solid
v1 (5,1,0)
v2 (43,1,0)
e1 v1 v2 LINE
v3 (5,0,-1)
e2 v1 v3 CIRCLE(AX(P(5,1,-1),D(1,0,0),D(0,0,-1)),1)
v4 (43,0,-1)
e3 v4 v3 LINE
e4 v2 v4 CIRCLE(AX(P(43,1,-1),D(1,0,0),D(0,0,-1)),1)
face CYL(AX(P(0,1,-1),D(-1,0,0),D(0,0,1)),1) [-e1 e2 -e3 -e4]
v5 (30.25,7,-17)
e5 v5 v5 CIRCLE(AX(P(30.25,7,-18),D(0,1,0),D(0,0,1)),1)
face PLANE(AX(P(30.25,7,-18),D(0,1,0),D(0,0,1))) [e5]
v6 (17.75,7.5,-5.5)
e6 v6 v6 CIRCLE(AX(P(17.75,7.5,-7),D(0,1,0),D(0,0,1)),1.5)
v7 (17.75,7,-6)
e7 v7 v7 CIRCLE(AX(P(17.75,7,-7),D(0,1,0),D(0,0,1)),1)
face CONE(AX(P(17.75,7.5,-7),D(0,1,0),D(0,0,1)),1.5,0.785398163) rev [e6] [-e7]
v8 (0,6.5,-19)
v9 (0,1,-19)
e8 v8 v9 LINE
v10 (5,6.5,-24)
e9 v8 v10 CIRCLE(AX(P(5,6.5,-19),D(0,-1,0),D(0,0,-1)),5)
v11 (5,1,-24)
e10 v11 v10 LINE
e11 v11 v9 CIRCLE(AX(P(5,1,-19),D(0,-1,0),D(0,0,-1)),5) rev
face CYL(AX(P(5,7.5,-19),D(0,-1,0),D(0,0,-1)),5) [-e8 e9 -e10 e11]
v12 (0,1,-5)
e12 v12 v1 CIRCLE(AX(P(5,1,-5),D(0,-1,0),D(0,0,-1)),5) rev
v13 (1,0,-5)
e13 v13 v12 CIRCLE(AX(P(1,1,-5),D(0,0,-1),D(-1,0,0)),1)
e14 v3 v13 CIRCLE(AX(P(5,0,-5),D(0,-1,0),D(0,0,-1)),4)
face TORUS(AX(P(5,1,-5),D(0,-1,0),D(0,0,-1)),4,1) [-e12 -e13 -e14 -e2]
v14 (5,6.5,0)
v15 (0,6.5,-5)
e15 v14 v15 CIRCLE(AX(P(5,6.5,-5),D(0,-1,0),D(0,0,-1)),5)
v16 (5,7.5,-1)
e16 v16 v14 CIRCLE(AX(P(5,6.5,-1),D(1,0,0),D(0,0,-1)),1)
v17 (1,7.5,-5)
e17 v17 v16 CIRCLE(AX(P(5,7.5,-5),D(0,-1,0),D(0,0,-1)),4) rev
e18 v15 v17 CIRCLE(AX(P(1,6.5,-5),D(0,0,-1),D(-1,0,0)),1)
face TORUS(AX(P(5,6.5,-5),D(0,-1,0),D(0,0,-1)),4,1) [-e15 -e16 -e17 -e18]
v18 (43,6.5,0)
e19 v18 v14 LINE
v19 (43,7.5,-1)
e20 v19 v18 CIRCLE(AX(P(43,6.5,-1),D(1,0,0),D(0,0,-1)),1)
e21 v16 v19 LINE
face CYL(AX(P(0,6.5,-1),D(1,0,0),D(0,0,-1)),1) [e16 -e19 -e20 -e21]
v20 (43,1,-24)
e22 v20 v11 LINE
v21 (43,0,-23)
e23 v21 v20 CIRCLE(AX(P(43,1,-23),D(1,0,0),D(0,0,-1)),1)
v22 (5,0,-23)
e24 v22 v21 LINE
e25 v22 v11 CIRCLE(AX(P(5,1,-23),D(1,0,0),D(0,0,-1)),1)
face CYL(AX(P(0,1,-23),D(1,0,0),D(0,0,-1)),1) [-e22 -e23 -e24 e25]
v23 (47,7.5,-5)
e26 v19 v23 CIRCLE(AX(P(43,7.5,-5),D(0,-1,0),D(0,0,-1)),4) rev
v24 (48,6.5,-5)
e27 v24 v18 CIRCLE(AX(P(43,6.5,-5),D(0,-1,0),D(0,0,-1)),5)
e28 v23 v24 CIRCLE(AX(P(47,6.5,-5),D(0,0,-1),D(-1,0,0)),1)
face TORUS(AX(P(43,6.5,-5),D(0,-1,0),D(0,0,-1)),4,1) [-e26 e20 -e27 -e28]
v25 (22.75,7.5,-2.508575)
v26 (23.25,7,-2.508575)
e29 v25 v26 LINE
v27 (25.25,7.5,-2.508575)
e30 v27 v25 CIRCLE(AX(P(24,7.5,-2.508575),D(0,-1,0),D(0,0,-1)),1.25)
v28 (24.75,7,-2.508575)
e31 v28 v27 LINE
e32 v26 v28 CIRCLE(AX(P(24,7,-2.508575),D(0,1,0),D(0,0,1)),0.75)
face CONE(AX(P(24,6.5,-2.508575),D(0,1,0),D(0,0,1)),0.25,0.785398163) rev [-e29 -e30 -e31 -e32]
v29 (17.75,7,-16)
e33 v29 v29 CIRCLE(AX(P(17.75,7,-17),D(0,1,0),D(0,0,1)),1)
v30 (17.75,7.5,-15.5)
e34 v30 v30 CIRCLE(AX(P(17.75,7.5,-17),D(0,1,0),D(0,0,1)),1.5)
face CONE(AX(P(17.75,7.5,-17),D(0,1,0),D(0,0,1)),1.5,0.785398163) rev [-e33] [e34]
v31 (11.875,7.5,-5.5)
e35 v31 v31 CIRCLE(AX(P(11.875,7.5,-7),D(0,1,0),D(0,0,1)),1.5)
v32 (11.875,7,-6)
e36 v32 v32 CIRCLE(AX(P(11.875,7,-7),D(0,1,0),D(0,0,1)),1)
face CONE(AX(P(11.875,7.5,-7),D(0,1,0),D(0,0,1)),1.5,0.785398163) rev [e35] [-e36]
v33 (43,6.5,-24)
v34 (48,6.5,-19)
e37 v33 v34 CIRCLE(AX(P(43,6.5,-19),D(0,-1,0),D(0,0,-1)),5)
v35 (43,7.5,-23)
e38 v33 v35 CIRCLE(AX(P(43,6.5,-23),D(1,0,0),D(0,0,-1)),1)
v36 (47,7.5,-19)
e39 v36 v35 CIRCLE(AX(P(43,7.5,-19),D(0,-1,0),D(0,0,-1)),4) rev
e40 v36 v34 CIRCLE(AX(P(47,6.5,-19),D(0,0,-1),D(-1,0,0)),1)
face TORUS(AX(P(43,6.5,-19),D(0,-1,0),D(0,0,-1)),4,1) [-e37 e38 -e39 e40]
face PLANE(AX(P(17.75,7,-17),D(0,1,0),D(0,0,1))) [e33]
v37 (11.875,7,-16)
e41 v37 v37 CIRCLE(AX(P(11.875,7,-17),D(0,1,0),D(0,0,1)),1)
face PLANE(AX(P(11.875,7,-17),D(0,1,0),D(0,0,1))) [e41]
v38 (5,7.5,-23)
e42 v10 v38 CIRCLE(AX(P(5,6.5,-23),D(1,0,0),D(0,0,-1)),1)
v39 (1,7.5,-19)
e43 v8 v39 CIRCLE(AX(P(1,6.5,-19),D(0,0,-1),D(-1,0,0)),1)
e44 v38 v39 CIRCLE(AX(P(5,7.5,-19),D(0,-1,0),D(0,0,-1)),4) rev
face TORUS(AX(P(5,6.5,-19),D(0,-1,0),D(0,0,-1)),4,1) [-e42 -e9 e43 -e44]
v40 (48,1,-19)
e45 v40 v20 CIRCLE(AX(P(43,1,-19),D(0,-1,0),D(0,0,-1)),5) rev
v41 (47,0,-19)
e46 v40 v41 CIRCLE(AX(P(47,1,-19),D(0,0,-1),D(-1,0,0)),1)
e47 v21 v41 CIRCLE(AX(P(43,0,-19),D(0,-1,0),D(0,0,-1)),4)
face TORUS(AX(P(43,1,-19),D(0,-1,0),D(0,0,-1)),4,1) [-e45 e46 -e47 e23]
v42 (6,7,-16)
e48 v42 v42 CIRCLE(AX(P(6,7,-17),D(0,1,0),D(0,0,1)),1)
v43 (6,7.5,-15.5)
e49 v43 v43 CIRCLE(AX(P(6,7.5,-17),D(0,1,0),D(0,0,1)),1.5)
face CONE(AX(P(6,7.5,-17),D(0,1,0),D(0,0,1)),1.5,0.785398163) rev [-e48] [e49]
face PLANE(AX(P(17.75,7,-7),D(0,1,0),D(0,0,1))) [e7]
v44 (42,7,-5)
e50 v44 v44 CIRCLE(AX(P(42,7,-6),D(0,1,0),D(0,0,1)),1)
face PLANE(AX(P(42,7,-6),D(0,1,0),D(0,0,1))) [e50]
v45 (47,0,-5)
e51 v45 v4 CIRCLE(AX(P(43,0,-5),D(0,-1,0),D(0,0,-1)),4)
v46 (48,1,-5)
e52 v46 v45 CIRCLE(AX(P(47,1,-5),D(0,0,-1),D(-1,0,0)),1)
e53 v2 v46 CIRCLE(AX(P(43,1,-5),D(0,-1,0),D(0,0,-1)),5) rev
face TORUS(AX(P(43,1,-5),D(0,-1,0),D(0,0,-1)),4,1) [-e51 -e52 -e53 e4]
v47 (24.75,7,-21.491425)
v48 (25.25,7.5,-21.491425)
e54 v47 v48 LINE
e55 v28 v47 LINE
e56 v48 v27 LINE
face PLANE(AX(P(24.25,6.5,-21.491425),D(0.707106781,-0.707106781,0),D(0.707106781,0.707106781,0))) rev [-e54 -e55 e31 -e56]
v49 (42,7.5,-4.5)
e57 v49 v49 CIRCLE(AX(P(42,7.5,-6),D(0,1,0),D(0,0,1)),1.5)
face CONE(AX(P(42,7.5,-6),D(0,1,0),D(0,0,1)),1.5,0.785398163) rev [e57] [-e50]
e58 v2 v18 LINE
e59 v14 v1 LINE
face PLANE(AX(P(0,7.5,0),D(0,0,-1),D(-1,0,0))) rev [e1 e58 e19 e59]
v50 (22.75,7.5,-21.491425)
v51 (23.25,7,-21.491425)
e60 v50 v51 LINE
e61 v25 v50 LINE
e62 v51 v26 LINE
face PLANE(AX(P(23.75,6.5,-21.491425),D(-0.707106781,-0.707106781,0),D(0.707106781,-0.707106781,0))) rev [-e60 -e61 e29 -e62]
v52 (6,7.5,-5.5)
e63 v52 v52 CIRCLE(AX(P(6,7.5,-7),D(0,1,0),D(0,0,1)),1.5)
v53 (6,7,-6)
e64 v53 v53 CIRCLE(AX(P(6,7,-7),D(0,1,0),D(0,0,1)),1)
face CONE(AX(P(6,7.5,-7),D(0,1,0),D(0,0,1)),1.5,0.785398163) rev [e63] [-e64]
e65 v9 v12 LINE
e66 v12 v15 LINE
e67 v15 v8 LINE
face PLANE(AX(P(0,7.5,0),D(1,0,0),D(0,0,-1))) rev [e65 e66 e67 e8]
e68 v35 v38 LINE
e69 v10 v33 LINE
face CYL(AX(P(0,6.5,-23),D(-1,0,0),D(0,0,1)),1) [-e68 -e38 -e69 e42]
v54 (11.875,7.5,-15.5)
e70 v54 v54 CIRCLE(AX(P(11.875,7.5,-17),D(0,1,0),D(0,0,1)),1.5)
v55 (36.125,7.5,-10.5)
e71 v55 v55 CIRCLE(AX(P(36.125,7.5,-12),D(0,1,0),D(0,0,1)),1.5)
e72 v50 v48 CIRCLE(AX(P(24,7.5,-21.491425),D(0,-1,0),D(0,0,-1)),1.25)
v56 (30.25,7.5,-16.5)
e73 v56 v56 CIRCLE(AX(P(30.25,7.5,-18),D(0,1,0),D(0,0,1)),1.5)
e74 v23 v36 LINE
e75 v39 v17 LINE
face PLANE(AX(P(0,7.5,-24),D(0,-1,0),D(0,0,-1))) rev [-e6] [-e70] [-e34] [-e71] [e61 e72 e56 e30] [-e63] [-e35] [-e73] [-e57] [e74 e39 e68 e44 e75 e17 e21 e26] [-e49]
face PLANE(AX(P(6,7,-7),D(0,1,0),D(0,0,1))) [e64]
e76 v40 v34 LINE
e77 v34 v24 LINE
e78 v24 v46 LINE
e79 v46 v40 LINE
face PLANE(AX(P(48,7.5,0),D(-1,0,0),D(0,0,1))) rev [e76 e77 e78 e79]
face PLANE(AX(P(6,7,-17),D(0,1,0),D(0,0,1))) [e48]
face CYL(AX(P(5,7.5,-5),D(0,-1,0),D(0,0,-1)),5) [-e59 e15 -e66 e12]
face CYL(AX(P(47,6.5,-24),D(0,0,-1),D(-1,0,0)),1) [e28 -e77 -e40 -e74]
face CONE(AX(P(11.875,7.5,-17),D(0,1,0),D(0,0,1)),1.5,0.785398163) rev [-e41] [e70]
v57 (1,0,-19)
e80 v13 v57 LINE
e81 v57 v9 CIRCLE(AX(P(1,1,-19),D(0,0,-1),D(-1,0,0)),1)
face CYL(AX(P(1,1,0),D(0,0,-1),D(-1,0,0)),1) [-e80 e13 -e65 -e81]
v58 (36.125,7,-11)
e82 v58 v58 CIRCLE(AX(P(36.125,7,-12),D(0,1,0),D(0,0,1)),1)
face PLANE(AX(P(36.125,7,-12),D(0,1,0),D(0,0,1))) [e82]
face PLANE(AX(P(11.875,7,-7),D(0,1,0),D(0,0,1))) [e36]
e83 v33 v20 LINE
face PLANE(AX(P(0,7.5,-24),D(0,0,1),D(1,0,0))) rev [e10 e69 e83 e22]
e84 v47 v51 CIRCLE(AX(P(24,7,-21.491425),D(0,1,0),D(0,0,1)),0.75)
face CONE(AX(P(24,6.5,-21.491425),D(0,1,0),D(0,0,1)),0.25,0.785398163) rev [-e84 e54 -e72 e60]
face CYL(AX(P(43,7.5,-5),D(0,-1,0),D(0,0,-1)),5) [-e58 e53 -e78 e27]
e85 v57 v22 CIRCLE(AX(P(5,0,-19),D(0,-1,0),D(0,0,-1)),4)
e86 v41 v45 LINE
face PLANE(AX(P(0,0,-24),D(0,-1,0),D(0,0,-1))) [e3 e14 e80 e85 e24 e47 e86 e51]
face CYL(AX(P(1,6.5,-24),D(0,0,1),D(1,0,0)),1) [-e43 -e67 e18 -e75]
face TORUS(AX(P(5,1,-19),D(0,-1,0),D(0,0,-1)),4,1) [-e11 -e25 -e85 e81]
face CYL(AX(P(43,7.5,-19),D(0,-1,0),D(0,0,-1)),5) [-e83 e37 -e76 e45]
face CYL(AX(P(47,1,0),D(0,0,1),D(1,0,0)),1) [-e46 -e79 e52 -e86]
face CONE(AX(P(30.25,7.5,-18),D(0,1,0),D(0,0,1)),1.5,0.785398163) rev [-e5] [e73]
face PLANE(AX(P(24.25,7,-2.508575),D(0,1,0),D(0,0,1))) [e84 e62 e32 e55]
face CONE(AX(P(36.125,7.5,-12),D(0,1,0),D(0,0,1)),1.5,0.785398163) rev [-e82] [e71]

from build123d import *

# Parameters (mm, degrees)
ESQUISSE1_W                = 48
ESQUISSE1_H                = 24
EXTRUSION1_DEPTH           = 7.5
CONG_2_R                   = 5
CONG_5_R                   = 1
CONG_6_R                   = 1
ESQUISSE4_W                = 0.5
ESQUISSE4_H                = 18.982849842
EXTRUSION2_DEPTH           = 0.5
ESQUISSE5_R                = 0.25
EXTRUSION3_DEPTH           = 0.5
CHANFREIN1_SIZE            = 1
ESQUISSE6_R                = 1.5
EXTRUSION6_DEPTH           = 0.5
EXTRUSION6_DRAFT           = -45
EXTRUSION6_PROFILE_2_DEPTH = 0.5
EXTRUSION6_PROFILE_2_DRAFT = -45
EXTRUSION6_PROFILE_3_DEPTH = 0.5
EXTRUSION6_PROFILE_3_DRAFT = -45
EXTRUSION6_PROFILE_4_DEPTH = 0.5
EXTRUSION6_PROFILE_4_DRAFT = -45
EXTRUSION6_PROFILE_5_DEPTH = 0.5
EXTRUSION6_PROFILE_5_DRAFT = -45
EXTRUSION6_PROFILE_6_DEPTH = 0.5
EXTRUSION6_PROFILE_6_DRAFT = -45
EXTRUSION6_PROFILE_7_DEPTH = 0.5
EXTRUSION6_PROFILE_7_DRAFT = -45
EXTRUSION6_PROFILE_8_DEPTH = 0.5
EXTRUSION6_PROFILE_8_DRAFT = -45
EXTRUSION6_PROFILE_9_DEPTH = 0.5
EXTRUSION6_PROFILE_9_DRAFT = -45


with BuildPart() as part:
    # Esquisse1 → Extrusion1 (new body)
    with BuildSketch(Plane(origin=(0, 0, 0), x_dir=(1, 0, 0), z_dir=(0, 1, 0))):
        with Locations((24, 12)):
            Rectangle(ESQUISSE1_W, ESQUISSE1_H)
    extrude(amount=EXTRUSION1_DEPTH)

    # Congé2
    cong_2_edges = [part.edges().sort_by_distance(p)[0] for p in [
        (0, 3.75, -24),
        (48, 3.75, -24),
        (48, 3.75, 0),
        (0, 3.75, 0),
    ]]
    fillet(cong_2_edges, radius=CONG_2_R)

    # Congé5
    cong_5_edges = [part.edges().sort_by_distance(p)[0] for p in [
        (48, 7.5, -12),
        (24, 7.5, 0),
        (0, 7.5, -12),
        (24, 7.5, -24),
        (1.464466094, 7.5, -22.535533906),
        (1.464466094, 7.5, -1.464466094),
        (46.535533906, 7.5, -22.535533906),
        (46.535533906, 7.5, -1.464466094),
    ]]
    fillet(cong_5_edges, radius=CONG_5_R)

    # Congé6
    cong_6_edges = [part.edges().sort_by_distance(p)[0] for p in [
        (48, 0, -12),
        (0, 0, -12),
        (24, 0, -24),
        (24, 0, 0),
        (1.464466094, 0, -22.535533906),
        (1.464466094, 0, -1.464466094),
        (46.535533906, 0, -22.535533906),
        (46.535533906, 0, -1.464466094),
    ]]
    fillet(cong_6_edges, radius=CONG_6_R)

    # Esquisse4 → Extrusion2 (cut)
    with BuildSketch(Plane(origin=(0, 7.5, 0), x_dir=(1, 0, 0), z_dir=(0, 1, 0))):
        with Locations((24, 12)):
            Rectangle(ESQUISSE4_W, ESQUISSE4_H)
    extrude(amount=-EXTRUSION2_DEPTH, mode=Mode.SUBTRACT)

    # Esquisse5 → Extrusion3 (cut)
    with BuildSketch(Plane(origin=(0, 7.5, 0), x_dir=(1, 0, 0), z_dir=(0, 1, 0))):
        with Locations((24, 21.491424921)):
            Circle(ESQUISSE5_R)
        with Locations((24, 2.508575079)):
            Circle(ESQUISSE5_R)
    extrude(amount=-EXTRUSION3_DEPTH, mode=Mode.SUBTRACT)

    # Chanfrein1
    # the kernel refuses this chamfer: 1 mm, written as the material it takes off along each edge
    with BuildSketch(Plane(origin=(24, 7.5, -21.491424921), x_dir=(1, 0, 0), z_dir=(0, 0, 1))) as chanfrein1_piece_1_section:
        Polygon((0.25 + CHANFREIN1_SIZE, 0), (0.25, -CHANFREIN1_SIZE), (0.25, 0), align=None)
    chanfrein1_piece_1 = revolve(axis=Axis((24, 7.5, -21.491424921), (0, 1, 0)), revolution_arc=180, mode=Mode.PRIVATE)
    chanfrein1_piece_1 = split(chanfrein1_piece_1, bisect_by=Plane(origin=(24, 7, -21.964580549), z_dir=(0, 1, 0)), keep=Keep.TOP, mode=Mode.PRIVATE)
    add(chanfrein1_piece_1, mode=Mode.SUBTRACT)
    with BuildSketch(Plane(origin=(24.25, 7.5, -21.491424921), x_dir=(0.9996219169112968, 0.02749587661058651, 0), z_dir=(0, 0, 1))) as chanfrein1_piece_2_section:
        Polygon((CHANFREIN1_SIZE * 0.999621916911, -CHANFREIN1_SIZE * 0.0274958766106), (-CHANFREIN1_SIZE * 0.0274958766106, -CHANFREIN1_SIZE * 0.999621916911), (0, 0), align=None)
    chanfrein1_piece_2 = extrude(amount=18.982849842, mode=Mode.PRIVATE)
    chanfrein1_piece_2 = split(chanfrein1_piece_2, bisect_by=Plane(origin=(24.643401084, 7, -12), z_dir=(0, 1, 0)), keep=Keep.TOP, mode=Mode.PRIVATE)
    add(chanfrein1_piece_2, mode=Mode.SUBTRACT)
    with BuildSketch(Plane(origin=(24, 7.5, -2.508575079), x_dir=(-1, 0, 0), z_dir=(0, 0, -1))) as chanfrein1_piece_3_section:
        Polygon((0.25 + CHANFREIN1_SIZE, 0), (0.25, -CHANFREIN1_SIZE), (0.25, 0), align=None)
    chanfrein1_piece_3 = revolve(axis=Axis((24, 7.5, -2.508575079), (0, 1, 0)), revolution_arc=180, mode=Mode.PRIVATE)
    chanfrein1_piece_3 = split(chanfrein1_piece_3, bisect_by=Plane(origin=(24, 7, -2.035419451), z_dir=(0, 1, 0)), keep=Keep.TOP, mode=Mode.PRIVATE)
    add(chanfrein1_piece_3, mode=Mode.SUBTRACT)
    with BuildSketch(Plane(origin=(23.75, 7.5, -2.508575079), x_dir=(-0.9996219169112968, 0.02749587661058651, 0), z_dir=(0, 0, -1))) as chanfrein1_piece_4_section:
        Polygon((CHANFREIN1_SIZE * 0.999621916911, -CHANFREIN1_SIZE * 0.0274958766106), (-CHANFREIN1_SIZE * 0.0274958766106, -CHANFREIN1_SIZE * 0.999621916911), (0, 0), align=None)
    chanfrein1_piece_4 = extrude(amount=18.982849842, mode=Mode.PRIVATE)
    chanfrein1_piece_4 = split(chanfrein1_piece_4, bisect_by=Plane(origin=(23.356598916, 7, -12), z_dir=(0, 1, 0)), keep=Keep.TOP, mode=Mode.PRIVATE)
    add(chanfrein1_piece_4, mode=Mode.SUBTRACT)


with BuildPart() as extrusion6_tool:
    # Esquisse6 → Extrusion6 (with draft: the straight prism first)
    with BuildSketch(Plane(origin=(0, 7.5, 0), x_dir=(1, 0, 0), z_dir=(0, 1, 0))):
        with Locations((42, 6)):
            Circle(ESQUISSE6_R)
    extrude(amount=-EXTRUSION6_DEPTH)
    # Extrusion6: the draft: its side faces are tilted about the plane it starts from
    extrusion6_sides = [extrusion6_tool.faces().sort_by_distance(p)[0] for p in [
        (40.5, 7.25, -6),
    ]]
    draft(extrusion6_sides, Plane(origin=(0, 7.5, 0), x_dir=(1, 0, 0), z_dir=(0, 1, 0)), EXTRUSION6_DRAFT)


with BuildPart() as part_1:
    add(part.part)

    # Extrusion6: cut by extrusion6_tool
    add(extrusion6_tool.part, mode=Mode.SUBTRACT)


with BuildPart() as extrusion6_profile_2_tool:
    # Esquisse6 → Extrusion6 profile 2 (with draft: the straight prism first)
    with BuildSketch(Plane(origin=(0, 7.5, 0), x_dir=(1, 0, 0), z_dir=(0, 1, 0))):
        with Locations((30.25, 18)):
            Circle(ESQUISSE6_R)
    extrude(amount=-EXTRUSION6_PROFILE_2_DEPTH)
    # Extrusion6 profile 2: the draft: its side faces are tilted about the plane it starts from
    extrusion6_profile_2_sides = [extrusion6_profile_2_tool.faces().sort_by_distance(p)[0] for p in [
        (28.75, 7.25, -18),
    ]]
    draft(extrusion6_profile_2_sides, Plane(origin=(0, 7.5, 0), x_dir=(1, 0, 0), z_dir=(0, 1, 0)), EXTRUSION6_PROFILE_2_DRAFT)


with BuildPart() as part_2:
    add(part_1.part)

    # Extrusion6 profile 2: cut by extrusion6_profile_2_tool
    add(extrusion6_profile_2_tool.part, mode=Mode.SUBTRACT)


with BuildPart() as extrusion6_profile_3_tool:
    # Esquisse6 → Extrusion6 profile 3 (with draft: the straight prism first)
    with BuildSketch(Plane(origin=(0, 7.5, 0), x_dir=(1, 0, 0), z_dir=(0, 1, 0))):
        with Locations((11.875, 17)):
            Circle(ESQUISSE6_R)
    extrude(amount=-EXTRUSION6_PROFILE_3_DEPTH)
    # Extrusion6 profile 3: the draft: its side faces are tilted about the plane it starts from
    extrusion6_profile_3_sides = [extrusion6_profile_3_tool.faces().sort_by_distance(p)[0] for p in [
        (10.375, 7.25, -17),
    ]]
    draft(extrusion6_profile_3_sides, Plane(origin=(0, 7.5, 0), x_dir=(1, 0, 0), z_dir=(0, 1, 0)), EXTRUSION6_PROFILE_3_DRAFT)


with BuildPart() as part_3:
    add(part_2.part)

    # Extrusion6 profile 3: cut by extrusion6_profile_3_tool
    add(extrusion6_profile_3_tool.part, mode=Mode.SUBTRACT)


with BuildPart() as extrusion6_profile_4_tool:
    # Esquisse6 → Extrusion6 profile 4 (with draft: the straight prism first)
    with BuildSketch(Plane(origin=(0, 7.5, 0), x_dir=(1, 0, 0), z_dir=(0, 1, 0))):
        with Locations((17.75, 17)):
            Circle(ESQUISSE6_R)
    extrude(amount=-EXTRUSION6_PROFILE_4_DEPTH)
    # Extrusion6 profile 4: the draft: its side faces are tilted about the plane it starts from
    extrusion6_profile_4_sides = [extrusion6_profile_4_tool.faces().sort_by_distance(p)[0] for p in [
        (16.25, 7.25, -17),
    ]]
    draft(extrusion6_profile_4_sides, Plane(origin=(0, 7.5, 0), x_dir=(1, 0, 0), z_dir=(0, 1, 0)), EXTRUSION6_PROFILE_4_DRAFT)


with BuildPart() as part_4:
    add(part_3.part)

    # Extrusion6 profile 4: cut by extrusion6_profile_4_tool
    add(extrusion6_profile_4_tool.part, mode=Mode.SUBTRACT)


with BuildPart() as extrusion6_profile_5_tool:
    # Esquisse6 → Extrusion6 profile 5 (with draft: the straight prism first)
    with BuildSketch(Plane(origin=(0, 7.5, 0), x_dir=(1, 0, 0), z_dir=(0, 1, 0))):
        with Locations((6, 17)):
            Circle(ESQUISSE6_R)
    extrude(amount=-EXTRUSION6_PROFILE_5_DEPTH)
    # Extrusion6 profile 5: the draft: its side faces are tilted about the plane it starts from
    extrusion6_profile_5_sides = [extrusion6_profile_5_tool.faces().sort_by_distance(p)[0] for p in [
        (4.5, 7.25, -17),
    ]]
    draft(extrusion6_profile_5_sides, Plane(origin=(0, 7.5, 0), x_dir=(1, 0, 0), z_dir=(0, 1, 0)), EXTRUSION6_PROFILE_5_DRAFT)


with BuildPart() as part_5:
    add(part_4.part)

    # Extrusion6 profile 5: cut by extrusion6_profile_5_tool
    add(extrusion6_profile_5_tool.part, mode=Mode.SUBTRACT)


with BuildPart() as extrusion6_profile_6_tool:
    # Esquisse6 → Extrusion6 profile 6 (with draft: the straight prism first)
    with BuildSketch(Plane(origin=(0, 7.5, 0), x_dir=(1, 0, 0), z_dir=(0, 1, 0))):
        with Locations((11.875, 7)):
            Circle(ESQUISSE6_R)
    extrude(amount=-EXTRUSION6_PROFILE_6_DEPTH)
    # Extrusion6 profile 6: the draft: its side faces are tilted about the plane it starts from
    extrusion6_profile_6_sides = [extrusion6_profile_6_tool.faces().sort_by_distance(p)[0] for p in [
        (10.375, 7.25, -7),
    ]]
    draft(extrusion6_profile_6_sides, Plane(origin=(0, 7.5, 0), x_dir=(1, 0, 0), z_dir=(0, 1, 0)), EXTRUSION6_PROFILE_6_DRAFT)


with BuildPart() as part_6:
    add(part_5.part)

    # Extrusion6 profile 6: cut by extrusion6_profile_6_tool
    add(extrusion6_profile_6_tool.part, mode=Mode.SUBTRACT)


with BuildPart() as extrusion6_profile_7_tool:
    # Esquisse6 → Extrusion6 profile 7 (with draft: the straight prism first)
    with BuildSketch(Plane(origin=(0, 7.5, 0), x_dir=(1, 0, 0), z_dir=(0, 1, 0))):
        with Locations((6, 7)):
            Circle(ESQUISSE6_R)
    extrude(amount=-EXTRUSION6_PROFILE_7_DEPTH)
    # Extrusion6 profile 7: the draft: its side faces are tilted about the plane it starts from
    extrusion6_profile_7_sides = [extrusion6_profile_7_tool.faces().sort_by_distance(p)[0] for p in [
        (4.5, 7.25, -7),
    ]]
    draft(extrusion6_profile_7_sides, Plane(origin=(0, 7.5, 0), x_dir=(1, 0, 0), z_dir=(0, 1, 0)), EXTRUSION6_PROFILE_7_DRAFT)


with BuildPart() as part_7:
    add(part_6.part)

    # Extrusion6 profile 7: cut by extrusion6_profile_7_tool
    add(extrusion6_profile_7_tool.part, mode=Mode.SUBTRACT)


with BuildPart() as extrusion6_profile_8_tool:
    # Esquisse6 → Extrusion6 profile 8 (with draft: the straight prism first)
    with BuildSketch(Plane(origin=(0, 7.5, 0), x_dir=(1, 0, 0), z_dir=(0, 1, 0))):
        with Locations((17.75, 7)):
            Circle(ESQUISSE6_R)
    extrude(amount=-EXTRUSION6_PROFILE_8_DEPTH)
    # Extrusion6 profile 8: the draft: its side faces are tilted about the plane it starts from
    extrusion6_profile_8_sides = [extrusion6_profile_8_tool.faces().sort_by_distance(p)[0] for p in [
        (16.25, 7.25, -7),
    ]]
    draft(extrusion6_profile_8_sides, Plane(origin=(0, 7.5, 0), x_dir=(1, 0, 0), z_dir=(0, 1, 0)), EXTRUSION6_PROFILE_8_DRAFT)


with BuildPart() as part_8:
    add(part_7.part)

    # Extrusion6 profile 8: cut by extrusion6_profile_8_tool
    add(extrusion6_profile_8_tool.part, mode=Mode.SUBTRACT)


with BuildPart() as extrusion6_profile_9_tool:
    # Esquisse6 → Extrusion6 profile 9 (with draft: the straight prism first)
    with BuildSketch(Plane(origin=(0, 7.5, 0), x_dir=(1, 0, 0), z_dir=(0, 1, 0))):
        with Locations((36.125, 12)):
            Circle(ESQUISSE6_R)
    extrude(amount=-EXTRUSION6_PROFILE_9_DEPTH)
    # Extrusion6 profile 9: the draft: its side faces are tilted about the plane it starts from
    extrusion6_profile_9_sides = [extrusion6_profile_9_tool.faces().sort_by_distance(p)[0] for p in [
        (34.625, 7.25, -12),
    ]]
    draft(extrusion6_profile_9_sides, Plane(origin=(0, 7.5, 0), x_dir=(1, 0, 0), z_dir=(0, 1, 0)), EXTRUSION6_PROFILE_9_DRAFT)


with BuildPart() as part_9:
    add(part_8.part)

    # Extrusion6 profile 9: cut by extrusion6_profile_9_tool
    add(extrusion6_profile_9_tool.part, mode=Mode.SUBTRACT)


solid = part_9.part
